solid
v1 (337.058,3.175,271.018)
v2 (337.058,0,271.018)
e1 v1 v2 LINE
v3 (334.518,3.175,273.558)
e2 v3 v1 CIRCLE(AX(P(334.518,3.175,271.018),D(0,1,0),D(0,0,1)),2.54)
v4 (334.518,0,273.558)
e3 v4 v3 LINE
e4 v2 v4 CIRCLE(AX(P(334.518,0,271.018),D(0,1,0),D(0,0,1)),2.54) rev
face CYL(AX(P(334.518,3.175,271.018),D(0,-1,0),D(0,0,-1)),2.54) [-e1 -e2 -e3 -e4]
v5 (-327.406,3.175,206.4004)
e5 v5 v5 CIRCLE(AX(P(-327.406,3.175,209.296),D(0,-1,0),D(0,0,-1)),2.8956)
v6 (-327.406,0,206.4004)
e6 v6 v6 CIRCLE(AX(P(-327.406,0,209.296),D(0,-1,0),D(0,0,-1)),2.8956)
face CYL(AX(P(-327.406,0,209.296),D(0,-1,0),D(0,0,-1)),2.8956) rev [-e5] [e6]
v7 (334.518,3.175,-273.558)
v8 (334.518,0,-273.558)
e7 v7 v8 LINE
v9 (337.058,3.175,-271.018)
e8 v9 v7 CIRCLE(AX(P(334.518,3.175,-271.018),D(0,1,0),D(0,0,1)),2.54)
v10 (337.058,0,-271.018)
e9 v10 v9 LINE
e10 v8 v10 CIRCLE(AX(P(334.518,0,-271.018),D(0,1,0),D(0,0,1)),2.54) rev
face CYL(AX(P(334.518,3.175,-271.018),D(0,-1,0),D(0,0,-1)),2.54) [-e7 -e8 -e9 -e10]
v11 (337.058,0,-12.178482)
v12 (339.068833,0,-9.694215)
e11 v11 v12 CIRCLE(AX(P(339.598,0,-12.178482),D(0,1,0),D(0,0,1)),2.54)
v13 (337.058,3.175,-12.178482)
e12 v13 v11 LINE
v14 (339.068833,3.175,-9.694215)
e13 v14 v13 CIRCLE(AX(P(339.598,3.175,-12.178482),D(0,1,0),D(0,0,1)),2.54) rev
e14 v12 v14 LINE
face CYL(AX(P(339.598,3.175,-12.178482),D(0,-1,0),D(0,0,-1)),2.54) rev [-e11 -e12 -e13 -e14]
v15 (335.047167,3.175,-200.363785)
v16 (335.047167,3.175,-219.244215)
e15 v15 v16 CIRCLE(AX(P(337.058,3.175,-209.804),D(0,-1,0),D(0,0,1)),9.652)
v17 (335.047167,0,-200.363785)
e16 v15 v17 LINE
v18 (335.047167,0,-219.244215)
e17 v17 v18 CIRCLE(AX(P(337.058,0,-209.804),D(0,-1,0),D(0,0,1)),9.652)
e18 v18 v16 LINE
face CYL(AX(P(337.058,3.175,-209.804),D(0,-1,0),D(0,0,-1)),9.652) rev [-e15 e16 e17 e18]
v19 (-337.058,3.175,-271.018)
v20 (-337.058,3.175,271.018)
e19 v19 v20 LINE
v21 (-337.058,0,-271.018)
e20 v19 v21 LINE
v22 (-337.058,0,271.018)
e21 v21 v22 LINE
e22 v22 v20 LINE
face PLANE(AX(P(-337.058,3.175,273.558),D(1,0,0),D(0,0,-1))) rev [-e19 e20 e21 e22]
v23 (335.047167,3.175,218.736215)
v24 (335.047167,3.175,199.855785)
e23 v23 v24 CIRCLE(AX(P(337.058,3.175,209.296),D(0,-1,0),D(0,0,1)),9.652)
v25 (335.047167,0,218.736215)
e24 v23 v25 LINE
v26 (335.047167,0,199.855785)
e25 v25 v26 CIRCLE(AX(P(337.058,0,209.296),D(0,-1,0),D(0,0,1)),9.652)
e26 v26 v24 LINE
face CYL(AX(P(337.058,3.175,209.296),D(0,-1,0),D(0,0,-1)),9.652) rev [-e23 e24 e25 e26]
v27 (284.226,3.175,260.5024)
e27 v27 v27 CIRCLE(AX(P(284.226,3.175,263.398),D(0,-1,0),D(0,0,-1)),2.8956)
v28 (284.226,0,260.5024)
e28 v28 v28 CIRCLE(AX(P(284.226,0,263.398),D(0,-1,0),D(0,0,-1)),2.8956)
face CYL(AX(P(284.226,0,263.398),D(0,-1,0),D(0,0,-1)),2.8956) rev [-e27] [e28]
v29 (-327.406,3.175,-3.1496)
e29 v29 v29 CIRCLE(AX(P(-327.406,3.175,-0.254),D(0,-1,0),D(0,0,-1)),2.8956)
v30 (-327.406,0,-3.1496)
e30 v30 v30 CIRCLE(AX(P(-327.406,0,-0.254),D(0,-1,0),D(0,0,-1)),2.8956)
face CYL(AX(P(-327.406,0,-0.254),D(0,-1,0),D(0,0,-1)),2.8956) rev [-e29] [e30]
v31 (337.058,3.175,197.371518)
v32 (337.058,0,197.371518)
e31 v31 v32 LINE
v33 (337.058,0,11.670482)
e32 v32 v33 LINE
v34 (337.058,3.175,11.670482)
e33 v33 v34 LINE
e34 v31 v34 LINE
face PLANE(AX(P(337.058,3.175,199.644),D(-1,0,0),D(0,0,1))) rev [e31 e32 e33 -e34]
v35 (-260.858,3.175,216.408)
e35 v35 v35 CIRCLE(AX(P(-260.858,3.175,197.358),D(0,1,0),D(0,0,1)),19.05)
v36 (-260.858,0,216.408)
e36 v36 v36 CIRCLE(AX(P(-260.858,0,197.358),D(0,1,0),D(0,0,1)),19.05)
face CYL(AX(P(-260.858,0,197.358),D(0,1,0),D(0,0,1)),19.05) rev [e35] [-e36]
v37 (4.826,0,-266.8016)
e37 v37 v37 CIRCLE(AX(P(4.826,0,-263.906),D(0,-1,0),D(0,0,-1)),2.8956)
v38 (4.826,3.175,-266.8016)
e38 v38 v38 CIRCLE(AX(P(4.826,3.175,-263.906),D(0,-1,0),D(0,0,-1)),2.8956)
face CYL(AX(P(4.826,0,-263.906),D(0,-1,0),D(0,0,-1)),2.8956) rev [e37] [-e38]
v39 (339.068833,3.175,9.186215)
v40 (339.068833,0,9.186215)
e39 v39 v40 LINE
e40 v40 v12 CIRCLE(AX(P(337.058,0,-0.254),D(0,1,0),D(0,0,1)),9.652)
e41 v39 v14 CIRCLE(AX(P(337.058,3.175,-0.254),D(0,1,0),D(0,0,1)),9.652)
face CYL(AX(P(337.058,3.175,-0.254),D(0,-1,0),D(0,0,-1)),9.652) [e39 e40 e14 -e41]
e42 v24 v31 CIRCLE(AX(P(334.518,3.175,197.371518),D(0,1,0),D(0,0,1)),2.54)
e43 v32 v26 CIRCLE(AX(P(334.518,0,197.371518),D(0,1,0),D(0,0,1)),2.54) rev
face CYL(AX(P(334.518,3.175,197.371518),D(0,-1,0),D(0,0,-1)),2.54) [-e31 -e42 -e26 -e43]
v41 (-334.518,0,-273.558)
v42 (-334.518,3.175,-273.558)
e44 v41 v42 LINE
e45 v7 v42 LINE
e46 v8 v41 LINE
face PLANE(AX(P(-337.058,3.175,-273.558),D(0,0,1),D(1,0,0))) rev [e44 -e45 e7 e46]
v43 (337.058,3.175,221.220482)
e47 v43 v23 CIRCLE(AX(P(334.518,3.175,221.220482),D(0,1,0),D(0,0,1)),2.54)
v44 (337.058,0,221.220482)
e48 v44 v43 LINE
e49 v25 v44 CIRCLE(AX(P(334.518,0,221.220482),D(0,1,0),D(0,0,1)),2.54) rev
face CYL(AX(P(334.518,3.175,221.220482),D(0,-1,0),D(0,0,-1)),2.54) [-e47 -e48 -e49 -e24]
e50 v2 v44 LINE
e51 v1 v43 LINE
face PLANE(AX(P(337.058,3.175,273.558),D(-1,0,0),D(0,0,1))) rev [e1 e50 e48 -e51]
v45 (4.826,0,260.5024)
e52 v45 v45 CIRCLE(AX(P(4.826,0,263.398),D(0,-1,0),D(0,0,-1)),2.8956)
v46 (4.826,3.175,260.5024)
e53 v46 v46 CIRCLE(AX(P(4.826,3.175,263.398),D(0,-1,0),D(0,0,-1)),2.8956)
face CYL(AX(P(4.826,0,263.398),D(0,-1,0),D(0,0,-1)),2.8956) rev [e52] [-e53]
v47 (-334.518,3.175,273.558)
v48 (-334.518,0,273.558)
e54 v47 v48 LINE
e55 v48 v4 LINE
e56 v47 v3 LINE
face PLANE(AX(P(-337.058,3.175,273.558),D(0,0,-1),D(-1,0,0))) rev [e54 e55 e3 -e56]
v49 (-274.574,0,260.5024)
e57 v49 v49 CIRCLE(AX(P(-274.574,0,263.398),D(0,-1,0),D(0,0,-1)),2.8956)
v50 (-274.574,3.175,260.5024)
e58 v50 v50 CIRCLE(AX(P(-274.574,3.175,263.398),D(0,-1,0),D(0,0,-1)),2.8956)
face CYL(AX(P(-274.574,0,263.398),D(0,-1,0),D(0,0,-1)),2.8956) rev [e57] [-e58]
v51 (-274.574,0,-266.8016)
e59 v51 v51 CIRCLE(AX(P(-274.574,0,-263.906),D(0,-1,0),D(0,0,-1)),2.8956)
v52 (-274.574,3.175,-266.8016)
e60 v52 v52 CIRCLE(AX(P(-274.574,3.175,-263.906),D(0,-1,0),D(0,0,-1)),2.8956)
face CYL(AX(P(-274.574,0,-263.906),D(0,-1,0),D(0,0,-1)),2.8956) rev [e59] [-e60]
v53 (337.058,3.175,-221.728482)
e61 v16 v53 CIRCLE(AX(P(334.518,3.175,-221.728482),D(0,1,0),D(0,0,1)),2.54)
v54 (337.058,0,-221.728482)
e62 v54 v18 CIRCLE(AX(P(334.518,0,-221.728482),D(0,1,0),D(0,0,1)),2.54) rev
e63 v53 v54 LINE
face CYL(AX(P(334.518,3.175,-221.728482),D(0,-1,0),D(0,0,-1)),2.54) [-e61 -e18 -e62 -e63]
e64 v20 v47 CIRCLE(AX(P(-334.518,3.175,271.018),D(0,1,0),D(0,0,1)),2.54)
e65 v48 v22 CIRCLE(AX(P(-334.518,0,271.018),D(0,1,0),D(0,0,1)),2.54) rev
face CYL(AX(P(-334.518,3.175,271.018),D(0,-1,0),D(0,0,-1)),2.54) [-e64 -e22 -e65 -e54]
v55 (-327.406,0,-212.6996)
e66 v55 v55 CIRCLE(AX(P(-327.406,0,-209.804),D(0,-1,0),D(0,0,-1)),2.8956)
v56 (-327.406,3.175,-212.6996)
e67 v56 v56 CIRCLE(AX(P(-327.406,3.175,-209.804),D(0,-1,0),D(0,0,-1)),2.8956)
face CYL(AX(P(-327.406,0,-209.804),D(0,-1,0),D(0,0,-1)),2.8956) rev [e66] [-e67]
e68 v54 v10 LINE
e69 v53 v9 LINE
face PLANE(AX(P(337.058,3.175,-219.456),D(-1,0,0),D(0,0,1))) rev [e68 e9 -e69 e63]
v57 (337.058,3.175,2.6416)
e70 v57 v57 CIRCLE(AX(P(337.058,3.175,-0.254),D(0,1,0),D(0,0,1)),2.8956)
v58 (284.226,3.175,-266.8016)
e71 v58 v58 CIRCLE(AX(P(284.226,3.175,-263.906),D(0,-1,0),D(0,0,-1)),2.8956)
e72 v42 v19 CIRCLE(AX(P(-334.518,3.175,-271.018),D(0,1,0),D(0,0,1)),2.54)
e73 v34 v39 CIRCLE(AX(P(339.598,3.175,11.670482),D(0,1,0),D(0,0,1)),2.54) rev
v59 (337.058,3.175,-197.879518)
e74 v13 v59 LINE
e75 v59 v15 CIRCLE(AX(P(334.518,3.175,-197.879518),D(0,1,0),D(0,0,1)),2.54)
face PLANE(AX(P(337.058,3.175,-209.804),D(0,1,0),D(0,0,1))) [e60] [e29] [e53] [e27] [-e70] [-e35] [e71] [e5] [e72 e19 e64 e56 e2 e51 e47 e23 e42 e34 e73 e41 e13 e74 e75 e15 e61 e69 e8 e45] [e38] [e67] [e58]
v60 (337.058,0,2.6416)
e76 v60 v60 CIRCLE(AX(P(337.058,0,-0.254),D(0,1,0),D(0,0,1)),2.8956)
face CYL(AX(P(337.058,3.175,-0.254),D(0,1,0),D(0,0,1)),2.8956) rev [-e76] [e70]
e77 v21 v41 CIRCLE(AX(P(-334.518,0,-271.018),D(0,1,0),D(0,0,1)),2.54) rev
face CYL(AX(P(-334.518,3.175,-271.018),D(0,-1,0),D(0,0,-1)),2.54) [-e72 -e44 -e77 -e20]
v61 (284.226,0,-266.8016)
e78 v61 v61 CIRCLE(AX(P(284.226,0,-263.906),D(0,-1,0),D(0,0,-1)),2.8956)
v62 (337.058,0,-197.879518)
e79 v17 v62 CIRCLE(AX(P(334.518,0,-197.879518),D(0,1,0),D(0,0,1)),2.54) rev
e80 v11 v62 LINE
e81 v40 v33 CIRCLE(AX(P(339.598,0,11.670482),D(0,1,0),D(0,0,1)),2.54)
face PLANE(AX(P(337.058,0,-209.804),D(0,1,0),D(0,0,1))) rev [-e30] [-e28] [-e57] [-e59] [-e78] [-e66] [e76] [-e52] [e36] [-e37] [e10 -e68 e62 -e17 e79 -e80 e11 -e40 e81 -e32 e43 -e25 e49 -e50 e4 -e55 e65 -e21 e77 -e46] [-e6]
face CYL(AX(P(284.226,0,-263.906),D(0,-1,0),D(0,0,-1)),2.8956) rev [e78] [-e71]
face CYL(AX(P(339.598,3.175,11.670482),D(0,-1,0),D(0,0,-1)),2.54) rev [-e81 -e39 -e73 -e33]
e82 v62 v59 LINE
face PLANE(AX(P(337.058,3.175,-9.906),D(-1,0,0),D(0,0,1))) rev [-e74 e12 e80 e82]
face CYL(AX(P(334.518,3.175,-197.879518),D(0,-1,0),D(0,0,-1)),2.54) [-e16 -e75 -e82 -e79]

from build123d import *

# Parameters (mm, degrees)
BOSS_EXTRUDE1_DEPTH        = 3.175
F_1_0_228_DIAMETER_HOLE2_D = 5.7912
FILLET2_R                  = 2.54
CUT_EXTRUDE3_OUTLINE_R     = 2.8956
CUT_EXTRUDE3_OUTLINE_R_2   = 19.05
CUT_EXTRUDE3_DEPTH         = 3.175


# Read off the part's stored shape, not the designer's step: Cut-Extrude3
with BuildPart() as part:
    # Sketch1 → Boss-Extrude1 (new body)
    with BuildSketch(Plane(origin=(0, 0, 0), x_dir=(1, 0, 0), z_dir=(0, 1, 0))):
        with BuildLine():
            Line((337.058, 219.456), (337.058, 273.558))
            Line((337.058, 273.558), (-337.058, 273.558))
            Line((-337.058, 273.558), (-337.058, -273.558))
            Line((-337.058, -273.558), (337.058, -273.558))
            Line((337.058, -273.558), (337.058, -218.948))
            ThreePointArc((337.058, -218.948), (327.406, -209.296), (337.058, -199.644))
            Line((337.058, -199.644), (337.058, -9.398))
            ThreePointArc((337.058, -9.398), (346.71, 0.254), (337.058, 9.906))
            Line((337.058, 9.906), (337.058, 200.152))
            ThreePointArc((337.058, 200.152), (327.406, 209.804), (337.058, 219.456))
        make_face()
    extrude(amount=BOSS_EXTRUDE1_DEPTH)

    # #1 (0.228) Diameter Hole2 (through all)
    with Locations(Plane(origin=(0, 3.175, 0), x_dir=(1, 0, 0), z_dir=(0, 1, 0))):
        with Locations((337.058, 0.254)):
            Hole(F_1_0_228_DIAMETER_HOLE2_D / 2)

    # Fillet2
    fillet2_edges = [part.edges().sort_by_distance(p)[0] for p in [
        (337.058, 1.5875, -273.558),
        (337.058, 1.5875, -219.456),
        (337.058, 1.5875, -200.152),
        (337.058, 1.5875, -9.906),
        (337.058, 1.5875, 9.398),
        (337.058, 1.5875, 199.644),
        (337.058, 1.5875, 218.948),
        (337.058, 1.5875, 273.558),
        (-337.058, 1.5875, 273.558),
        (-337.058, 1.5875, -273.558),
    ]]
    fillet(fillet2_edges, radius=FILLET2_R)

    # Cut-Extrude3 outline → Cut-Extrude3 (cut)
    with BuildSketch(Plane(origin=(0, 0, 0), x_dir=(1, 0, 0), z_dir=(0, 1, 0))):
        with Locations((284.226, -263.398)):
            Circle(CUT_EXTRUDE3_OUTLINE_R)
        with Locations((4.826, -263.398)):
            Circle(CUT_EXTRUDE3_OUTLINE_R)
        with Locations((-274.574, -263.398)):
            Circle(CUT_EXTRUDE3_OUTLINE_R)
        with Locations((-327.406, -209.296)):
            Circle(CUT_EXTRUDE3_OUTLINE_R)
        with Locations((-327.406, 0.254)):
            Circle(CUT_EXTRUDE3_OUTLINE_R)
        with Locations((-327.406, 209.804)):
            Circle(CUT_EXTRUDE3_OUTLINE_R)
        with Locations((-274.574, 263.906)):
            Circle(CUT_EXTRUDE3_OUTLINE_R)
        with Locations((4.826, 263.906)):
            Circle(CUT_EXTRUDE3_OUTLINE_R)
        with Locations((284.226, 263.906)):
            Circle(CUT_EXTRUDE3_OUTLINE_R)
        with Locations((-260.858, -197.358)):
            Circle(CUT_EXTRUDE3_OUTLINE_R_2)
    extrude(amount=CUT_EXTRUDE3_DEPTH, mode=Mode.SUBTRACT)


solid = part.part
